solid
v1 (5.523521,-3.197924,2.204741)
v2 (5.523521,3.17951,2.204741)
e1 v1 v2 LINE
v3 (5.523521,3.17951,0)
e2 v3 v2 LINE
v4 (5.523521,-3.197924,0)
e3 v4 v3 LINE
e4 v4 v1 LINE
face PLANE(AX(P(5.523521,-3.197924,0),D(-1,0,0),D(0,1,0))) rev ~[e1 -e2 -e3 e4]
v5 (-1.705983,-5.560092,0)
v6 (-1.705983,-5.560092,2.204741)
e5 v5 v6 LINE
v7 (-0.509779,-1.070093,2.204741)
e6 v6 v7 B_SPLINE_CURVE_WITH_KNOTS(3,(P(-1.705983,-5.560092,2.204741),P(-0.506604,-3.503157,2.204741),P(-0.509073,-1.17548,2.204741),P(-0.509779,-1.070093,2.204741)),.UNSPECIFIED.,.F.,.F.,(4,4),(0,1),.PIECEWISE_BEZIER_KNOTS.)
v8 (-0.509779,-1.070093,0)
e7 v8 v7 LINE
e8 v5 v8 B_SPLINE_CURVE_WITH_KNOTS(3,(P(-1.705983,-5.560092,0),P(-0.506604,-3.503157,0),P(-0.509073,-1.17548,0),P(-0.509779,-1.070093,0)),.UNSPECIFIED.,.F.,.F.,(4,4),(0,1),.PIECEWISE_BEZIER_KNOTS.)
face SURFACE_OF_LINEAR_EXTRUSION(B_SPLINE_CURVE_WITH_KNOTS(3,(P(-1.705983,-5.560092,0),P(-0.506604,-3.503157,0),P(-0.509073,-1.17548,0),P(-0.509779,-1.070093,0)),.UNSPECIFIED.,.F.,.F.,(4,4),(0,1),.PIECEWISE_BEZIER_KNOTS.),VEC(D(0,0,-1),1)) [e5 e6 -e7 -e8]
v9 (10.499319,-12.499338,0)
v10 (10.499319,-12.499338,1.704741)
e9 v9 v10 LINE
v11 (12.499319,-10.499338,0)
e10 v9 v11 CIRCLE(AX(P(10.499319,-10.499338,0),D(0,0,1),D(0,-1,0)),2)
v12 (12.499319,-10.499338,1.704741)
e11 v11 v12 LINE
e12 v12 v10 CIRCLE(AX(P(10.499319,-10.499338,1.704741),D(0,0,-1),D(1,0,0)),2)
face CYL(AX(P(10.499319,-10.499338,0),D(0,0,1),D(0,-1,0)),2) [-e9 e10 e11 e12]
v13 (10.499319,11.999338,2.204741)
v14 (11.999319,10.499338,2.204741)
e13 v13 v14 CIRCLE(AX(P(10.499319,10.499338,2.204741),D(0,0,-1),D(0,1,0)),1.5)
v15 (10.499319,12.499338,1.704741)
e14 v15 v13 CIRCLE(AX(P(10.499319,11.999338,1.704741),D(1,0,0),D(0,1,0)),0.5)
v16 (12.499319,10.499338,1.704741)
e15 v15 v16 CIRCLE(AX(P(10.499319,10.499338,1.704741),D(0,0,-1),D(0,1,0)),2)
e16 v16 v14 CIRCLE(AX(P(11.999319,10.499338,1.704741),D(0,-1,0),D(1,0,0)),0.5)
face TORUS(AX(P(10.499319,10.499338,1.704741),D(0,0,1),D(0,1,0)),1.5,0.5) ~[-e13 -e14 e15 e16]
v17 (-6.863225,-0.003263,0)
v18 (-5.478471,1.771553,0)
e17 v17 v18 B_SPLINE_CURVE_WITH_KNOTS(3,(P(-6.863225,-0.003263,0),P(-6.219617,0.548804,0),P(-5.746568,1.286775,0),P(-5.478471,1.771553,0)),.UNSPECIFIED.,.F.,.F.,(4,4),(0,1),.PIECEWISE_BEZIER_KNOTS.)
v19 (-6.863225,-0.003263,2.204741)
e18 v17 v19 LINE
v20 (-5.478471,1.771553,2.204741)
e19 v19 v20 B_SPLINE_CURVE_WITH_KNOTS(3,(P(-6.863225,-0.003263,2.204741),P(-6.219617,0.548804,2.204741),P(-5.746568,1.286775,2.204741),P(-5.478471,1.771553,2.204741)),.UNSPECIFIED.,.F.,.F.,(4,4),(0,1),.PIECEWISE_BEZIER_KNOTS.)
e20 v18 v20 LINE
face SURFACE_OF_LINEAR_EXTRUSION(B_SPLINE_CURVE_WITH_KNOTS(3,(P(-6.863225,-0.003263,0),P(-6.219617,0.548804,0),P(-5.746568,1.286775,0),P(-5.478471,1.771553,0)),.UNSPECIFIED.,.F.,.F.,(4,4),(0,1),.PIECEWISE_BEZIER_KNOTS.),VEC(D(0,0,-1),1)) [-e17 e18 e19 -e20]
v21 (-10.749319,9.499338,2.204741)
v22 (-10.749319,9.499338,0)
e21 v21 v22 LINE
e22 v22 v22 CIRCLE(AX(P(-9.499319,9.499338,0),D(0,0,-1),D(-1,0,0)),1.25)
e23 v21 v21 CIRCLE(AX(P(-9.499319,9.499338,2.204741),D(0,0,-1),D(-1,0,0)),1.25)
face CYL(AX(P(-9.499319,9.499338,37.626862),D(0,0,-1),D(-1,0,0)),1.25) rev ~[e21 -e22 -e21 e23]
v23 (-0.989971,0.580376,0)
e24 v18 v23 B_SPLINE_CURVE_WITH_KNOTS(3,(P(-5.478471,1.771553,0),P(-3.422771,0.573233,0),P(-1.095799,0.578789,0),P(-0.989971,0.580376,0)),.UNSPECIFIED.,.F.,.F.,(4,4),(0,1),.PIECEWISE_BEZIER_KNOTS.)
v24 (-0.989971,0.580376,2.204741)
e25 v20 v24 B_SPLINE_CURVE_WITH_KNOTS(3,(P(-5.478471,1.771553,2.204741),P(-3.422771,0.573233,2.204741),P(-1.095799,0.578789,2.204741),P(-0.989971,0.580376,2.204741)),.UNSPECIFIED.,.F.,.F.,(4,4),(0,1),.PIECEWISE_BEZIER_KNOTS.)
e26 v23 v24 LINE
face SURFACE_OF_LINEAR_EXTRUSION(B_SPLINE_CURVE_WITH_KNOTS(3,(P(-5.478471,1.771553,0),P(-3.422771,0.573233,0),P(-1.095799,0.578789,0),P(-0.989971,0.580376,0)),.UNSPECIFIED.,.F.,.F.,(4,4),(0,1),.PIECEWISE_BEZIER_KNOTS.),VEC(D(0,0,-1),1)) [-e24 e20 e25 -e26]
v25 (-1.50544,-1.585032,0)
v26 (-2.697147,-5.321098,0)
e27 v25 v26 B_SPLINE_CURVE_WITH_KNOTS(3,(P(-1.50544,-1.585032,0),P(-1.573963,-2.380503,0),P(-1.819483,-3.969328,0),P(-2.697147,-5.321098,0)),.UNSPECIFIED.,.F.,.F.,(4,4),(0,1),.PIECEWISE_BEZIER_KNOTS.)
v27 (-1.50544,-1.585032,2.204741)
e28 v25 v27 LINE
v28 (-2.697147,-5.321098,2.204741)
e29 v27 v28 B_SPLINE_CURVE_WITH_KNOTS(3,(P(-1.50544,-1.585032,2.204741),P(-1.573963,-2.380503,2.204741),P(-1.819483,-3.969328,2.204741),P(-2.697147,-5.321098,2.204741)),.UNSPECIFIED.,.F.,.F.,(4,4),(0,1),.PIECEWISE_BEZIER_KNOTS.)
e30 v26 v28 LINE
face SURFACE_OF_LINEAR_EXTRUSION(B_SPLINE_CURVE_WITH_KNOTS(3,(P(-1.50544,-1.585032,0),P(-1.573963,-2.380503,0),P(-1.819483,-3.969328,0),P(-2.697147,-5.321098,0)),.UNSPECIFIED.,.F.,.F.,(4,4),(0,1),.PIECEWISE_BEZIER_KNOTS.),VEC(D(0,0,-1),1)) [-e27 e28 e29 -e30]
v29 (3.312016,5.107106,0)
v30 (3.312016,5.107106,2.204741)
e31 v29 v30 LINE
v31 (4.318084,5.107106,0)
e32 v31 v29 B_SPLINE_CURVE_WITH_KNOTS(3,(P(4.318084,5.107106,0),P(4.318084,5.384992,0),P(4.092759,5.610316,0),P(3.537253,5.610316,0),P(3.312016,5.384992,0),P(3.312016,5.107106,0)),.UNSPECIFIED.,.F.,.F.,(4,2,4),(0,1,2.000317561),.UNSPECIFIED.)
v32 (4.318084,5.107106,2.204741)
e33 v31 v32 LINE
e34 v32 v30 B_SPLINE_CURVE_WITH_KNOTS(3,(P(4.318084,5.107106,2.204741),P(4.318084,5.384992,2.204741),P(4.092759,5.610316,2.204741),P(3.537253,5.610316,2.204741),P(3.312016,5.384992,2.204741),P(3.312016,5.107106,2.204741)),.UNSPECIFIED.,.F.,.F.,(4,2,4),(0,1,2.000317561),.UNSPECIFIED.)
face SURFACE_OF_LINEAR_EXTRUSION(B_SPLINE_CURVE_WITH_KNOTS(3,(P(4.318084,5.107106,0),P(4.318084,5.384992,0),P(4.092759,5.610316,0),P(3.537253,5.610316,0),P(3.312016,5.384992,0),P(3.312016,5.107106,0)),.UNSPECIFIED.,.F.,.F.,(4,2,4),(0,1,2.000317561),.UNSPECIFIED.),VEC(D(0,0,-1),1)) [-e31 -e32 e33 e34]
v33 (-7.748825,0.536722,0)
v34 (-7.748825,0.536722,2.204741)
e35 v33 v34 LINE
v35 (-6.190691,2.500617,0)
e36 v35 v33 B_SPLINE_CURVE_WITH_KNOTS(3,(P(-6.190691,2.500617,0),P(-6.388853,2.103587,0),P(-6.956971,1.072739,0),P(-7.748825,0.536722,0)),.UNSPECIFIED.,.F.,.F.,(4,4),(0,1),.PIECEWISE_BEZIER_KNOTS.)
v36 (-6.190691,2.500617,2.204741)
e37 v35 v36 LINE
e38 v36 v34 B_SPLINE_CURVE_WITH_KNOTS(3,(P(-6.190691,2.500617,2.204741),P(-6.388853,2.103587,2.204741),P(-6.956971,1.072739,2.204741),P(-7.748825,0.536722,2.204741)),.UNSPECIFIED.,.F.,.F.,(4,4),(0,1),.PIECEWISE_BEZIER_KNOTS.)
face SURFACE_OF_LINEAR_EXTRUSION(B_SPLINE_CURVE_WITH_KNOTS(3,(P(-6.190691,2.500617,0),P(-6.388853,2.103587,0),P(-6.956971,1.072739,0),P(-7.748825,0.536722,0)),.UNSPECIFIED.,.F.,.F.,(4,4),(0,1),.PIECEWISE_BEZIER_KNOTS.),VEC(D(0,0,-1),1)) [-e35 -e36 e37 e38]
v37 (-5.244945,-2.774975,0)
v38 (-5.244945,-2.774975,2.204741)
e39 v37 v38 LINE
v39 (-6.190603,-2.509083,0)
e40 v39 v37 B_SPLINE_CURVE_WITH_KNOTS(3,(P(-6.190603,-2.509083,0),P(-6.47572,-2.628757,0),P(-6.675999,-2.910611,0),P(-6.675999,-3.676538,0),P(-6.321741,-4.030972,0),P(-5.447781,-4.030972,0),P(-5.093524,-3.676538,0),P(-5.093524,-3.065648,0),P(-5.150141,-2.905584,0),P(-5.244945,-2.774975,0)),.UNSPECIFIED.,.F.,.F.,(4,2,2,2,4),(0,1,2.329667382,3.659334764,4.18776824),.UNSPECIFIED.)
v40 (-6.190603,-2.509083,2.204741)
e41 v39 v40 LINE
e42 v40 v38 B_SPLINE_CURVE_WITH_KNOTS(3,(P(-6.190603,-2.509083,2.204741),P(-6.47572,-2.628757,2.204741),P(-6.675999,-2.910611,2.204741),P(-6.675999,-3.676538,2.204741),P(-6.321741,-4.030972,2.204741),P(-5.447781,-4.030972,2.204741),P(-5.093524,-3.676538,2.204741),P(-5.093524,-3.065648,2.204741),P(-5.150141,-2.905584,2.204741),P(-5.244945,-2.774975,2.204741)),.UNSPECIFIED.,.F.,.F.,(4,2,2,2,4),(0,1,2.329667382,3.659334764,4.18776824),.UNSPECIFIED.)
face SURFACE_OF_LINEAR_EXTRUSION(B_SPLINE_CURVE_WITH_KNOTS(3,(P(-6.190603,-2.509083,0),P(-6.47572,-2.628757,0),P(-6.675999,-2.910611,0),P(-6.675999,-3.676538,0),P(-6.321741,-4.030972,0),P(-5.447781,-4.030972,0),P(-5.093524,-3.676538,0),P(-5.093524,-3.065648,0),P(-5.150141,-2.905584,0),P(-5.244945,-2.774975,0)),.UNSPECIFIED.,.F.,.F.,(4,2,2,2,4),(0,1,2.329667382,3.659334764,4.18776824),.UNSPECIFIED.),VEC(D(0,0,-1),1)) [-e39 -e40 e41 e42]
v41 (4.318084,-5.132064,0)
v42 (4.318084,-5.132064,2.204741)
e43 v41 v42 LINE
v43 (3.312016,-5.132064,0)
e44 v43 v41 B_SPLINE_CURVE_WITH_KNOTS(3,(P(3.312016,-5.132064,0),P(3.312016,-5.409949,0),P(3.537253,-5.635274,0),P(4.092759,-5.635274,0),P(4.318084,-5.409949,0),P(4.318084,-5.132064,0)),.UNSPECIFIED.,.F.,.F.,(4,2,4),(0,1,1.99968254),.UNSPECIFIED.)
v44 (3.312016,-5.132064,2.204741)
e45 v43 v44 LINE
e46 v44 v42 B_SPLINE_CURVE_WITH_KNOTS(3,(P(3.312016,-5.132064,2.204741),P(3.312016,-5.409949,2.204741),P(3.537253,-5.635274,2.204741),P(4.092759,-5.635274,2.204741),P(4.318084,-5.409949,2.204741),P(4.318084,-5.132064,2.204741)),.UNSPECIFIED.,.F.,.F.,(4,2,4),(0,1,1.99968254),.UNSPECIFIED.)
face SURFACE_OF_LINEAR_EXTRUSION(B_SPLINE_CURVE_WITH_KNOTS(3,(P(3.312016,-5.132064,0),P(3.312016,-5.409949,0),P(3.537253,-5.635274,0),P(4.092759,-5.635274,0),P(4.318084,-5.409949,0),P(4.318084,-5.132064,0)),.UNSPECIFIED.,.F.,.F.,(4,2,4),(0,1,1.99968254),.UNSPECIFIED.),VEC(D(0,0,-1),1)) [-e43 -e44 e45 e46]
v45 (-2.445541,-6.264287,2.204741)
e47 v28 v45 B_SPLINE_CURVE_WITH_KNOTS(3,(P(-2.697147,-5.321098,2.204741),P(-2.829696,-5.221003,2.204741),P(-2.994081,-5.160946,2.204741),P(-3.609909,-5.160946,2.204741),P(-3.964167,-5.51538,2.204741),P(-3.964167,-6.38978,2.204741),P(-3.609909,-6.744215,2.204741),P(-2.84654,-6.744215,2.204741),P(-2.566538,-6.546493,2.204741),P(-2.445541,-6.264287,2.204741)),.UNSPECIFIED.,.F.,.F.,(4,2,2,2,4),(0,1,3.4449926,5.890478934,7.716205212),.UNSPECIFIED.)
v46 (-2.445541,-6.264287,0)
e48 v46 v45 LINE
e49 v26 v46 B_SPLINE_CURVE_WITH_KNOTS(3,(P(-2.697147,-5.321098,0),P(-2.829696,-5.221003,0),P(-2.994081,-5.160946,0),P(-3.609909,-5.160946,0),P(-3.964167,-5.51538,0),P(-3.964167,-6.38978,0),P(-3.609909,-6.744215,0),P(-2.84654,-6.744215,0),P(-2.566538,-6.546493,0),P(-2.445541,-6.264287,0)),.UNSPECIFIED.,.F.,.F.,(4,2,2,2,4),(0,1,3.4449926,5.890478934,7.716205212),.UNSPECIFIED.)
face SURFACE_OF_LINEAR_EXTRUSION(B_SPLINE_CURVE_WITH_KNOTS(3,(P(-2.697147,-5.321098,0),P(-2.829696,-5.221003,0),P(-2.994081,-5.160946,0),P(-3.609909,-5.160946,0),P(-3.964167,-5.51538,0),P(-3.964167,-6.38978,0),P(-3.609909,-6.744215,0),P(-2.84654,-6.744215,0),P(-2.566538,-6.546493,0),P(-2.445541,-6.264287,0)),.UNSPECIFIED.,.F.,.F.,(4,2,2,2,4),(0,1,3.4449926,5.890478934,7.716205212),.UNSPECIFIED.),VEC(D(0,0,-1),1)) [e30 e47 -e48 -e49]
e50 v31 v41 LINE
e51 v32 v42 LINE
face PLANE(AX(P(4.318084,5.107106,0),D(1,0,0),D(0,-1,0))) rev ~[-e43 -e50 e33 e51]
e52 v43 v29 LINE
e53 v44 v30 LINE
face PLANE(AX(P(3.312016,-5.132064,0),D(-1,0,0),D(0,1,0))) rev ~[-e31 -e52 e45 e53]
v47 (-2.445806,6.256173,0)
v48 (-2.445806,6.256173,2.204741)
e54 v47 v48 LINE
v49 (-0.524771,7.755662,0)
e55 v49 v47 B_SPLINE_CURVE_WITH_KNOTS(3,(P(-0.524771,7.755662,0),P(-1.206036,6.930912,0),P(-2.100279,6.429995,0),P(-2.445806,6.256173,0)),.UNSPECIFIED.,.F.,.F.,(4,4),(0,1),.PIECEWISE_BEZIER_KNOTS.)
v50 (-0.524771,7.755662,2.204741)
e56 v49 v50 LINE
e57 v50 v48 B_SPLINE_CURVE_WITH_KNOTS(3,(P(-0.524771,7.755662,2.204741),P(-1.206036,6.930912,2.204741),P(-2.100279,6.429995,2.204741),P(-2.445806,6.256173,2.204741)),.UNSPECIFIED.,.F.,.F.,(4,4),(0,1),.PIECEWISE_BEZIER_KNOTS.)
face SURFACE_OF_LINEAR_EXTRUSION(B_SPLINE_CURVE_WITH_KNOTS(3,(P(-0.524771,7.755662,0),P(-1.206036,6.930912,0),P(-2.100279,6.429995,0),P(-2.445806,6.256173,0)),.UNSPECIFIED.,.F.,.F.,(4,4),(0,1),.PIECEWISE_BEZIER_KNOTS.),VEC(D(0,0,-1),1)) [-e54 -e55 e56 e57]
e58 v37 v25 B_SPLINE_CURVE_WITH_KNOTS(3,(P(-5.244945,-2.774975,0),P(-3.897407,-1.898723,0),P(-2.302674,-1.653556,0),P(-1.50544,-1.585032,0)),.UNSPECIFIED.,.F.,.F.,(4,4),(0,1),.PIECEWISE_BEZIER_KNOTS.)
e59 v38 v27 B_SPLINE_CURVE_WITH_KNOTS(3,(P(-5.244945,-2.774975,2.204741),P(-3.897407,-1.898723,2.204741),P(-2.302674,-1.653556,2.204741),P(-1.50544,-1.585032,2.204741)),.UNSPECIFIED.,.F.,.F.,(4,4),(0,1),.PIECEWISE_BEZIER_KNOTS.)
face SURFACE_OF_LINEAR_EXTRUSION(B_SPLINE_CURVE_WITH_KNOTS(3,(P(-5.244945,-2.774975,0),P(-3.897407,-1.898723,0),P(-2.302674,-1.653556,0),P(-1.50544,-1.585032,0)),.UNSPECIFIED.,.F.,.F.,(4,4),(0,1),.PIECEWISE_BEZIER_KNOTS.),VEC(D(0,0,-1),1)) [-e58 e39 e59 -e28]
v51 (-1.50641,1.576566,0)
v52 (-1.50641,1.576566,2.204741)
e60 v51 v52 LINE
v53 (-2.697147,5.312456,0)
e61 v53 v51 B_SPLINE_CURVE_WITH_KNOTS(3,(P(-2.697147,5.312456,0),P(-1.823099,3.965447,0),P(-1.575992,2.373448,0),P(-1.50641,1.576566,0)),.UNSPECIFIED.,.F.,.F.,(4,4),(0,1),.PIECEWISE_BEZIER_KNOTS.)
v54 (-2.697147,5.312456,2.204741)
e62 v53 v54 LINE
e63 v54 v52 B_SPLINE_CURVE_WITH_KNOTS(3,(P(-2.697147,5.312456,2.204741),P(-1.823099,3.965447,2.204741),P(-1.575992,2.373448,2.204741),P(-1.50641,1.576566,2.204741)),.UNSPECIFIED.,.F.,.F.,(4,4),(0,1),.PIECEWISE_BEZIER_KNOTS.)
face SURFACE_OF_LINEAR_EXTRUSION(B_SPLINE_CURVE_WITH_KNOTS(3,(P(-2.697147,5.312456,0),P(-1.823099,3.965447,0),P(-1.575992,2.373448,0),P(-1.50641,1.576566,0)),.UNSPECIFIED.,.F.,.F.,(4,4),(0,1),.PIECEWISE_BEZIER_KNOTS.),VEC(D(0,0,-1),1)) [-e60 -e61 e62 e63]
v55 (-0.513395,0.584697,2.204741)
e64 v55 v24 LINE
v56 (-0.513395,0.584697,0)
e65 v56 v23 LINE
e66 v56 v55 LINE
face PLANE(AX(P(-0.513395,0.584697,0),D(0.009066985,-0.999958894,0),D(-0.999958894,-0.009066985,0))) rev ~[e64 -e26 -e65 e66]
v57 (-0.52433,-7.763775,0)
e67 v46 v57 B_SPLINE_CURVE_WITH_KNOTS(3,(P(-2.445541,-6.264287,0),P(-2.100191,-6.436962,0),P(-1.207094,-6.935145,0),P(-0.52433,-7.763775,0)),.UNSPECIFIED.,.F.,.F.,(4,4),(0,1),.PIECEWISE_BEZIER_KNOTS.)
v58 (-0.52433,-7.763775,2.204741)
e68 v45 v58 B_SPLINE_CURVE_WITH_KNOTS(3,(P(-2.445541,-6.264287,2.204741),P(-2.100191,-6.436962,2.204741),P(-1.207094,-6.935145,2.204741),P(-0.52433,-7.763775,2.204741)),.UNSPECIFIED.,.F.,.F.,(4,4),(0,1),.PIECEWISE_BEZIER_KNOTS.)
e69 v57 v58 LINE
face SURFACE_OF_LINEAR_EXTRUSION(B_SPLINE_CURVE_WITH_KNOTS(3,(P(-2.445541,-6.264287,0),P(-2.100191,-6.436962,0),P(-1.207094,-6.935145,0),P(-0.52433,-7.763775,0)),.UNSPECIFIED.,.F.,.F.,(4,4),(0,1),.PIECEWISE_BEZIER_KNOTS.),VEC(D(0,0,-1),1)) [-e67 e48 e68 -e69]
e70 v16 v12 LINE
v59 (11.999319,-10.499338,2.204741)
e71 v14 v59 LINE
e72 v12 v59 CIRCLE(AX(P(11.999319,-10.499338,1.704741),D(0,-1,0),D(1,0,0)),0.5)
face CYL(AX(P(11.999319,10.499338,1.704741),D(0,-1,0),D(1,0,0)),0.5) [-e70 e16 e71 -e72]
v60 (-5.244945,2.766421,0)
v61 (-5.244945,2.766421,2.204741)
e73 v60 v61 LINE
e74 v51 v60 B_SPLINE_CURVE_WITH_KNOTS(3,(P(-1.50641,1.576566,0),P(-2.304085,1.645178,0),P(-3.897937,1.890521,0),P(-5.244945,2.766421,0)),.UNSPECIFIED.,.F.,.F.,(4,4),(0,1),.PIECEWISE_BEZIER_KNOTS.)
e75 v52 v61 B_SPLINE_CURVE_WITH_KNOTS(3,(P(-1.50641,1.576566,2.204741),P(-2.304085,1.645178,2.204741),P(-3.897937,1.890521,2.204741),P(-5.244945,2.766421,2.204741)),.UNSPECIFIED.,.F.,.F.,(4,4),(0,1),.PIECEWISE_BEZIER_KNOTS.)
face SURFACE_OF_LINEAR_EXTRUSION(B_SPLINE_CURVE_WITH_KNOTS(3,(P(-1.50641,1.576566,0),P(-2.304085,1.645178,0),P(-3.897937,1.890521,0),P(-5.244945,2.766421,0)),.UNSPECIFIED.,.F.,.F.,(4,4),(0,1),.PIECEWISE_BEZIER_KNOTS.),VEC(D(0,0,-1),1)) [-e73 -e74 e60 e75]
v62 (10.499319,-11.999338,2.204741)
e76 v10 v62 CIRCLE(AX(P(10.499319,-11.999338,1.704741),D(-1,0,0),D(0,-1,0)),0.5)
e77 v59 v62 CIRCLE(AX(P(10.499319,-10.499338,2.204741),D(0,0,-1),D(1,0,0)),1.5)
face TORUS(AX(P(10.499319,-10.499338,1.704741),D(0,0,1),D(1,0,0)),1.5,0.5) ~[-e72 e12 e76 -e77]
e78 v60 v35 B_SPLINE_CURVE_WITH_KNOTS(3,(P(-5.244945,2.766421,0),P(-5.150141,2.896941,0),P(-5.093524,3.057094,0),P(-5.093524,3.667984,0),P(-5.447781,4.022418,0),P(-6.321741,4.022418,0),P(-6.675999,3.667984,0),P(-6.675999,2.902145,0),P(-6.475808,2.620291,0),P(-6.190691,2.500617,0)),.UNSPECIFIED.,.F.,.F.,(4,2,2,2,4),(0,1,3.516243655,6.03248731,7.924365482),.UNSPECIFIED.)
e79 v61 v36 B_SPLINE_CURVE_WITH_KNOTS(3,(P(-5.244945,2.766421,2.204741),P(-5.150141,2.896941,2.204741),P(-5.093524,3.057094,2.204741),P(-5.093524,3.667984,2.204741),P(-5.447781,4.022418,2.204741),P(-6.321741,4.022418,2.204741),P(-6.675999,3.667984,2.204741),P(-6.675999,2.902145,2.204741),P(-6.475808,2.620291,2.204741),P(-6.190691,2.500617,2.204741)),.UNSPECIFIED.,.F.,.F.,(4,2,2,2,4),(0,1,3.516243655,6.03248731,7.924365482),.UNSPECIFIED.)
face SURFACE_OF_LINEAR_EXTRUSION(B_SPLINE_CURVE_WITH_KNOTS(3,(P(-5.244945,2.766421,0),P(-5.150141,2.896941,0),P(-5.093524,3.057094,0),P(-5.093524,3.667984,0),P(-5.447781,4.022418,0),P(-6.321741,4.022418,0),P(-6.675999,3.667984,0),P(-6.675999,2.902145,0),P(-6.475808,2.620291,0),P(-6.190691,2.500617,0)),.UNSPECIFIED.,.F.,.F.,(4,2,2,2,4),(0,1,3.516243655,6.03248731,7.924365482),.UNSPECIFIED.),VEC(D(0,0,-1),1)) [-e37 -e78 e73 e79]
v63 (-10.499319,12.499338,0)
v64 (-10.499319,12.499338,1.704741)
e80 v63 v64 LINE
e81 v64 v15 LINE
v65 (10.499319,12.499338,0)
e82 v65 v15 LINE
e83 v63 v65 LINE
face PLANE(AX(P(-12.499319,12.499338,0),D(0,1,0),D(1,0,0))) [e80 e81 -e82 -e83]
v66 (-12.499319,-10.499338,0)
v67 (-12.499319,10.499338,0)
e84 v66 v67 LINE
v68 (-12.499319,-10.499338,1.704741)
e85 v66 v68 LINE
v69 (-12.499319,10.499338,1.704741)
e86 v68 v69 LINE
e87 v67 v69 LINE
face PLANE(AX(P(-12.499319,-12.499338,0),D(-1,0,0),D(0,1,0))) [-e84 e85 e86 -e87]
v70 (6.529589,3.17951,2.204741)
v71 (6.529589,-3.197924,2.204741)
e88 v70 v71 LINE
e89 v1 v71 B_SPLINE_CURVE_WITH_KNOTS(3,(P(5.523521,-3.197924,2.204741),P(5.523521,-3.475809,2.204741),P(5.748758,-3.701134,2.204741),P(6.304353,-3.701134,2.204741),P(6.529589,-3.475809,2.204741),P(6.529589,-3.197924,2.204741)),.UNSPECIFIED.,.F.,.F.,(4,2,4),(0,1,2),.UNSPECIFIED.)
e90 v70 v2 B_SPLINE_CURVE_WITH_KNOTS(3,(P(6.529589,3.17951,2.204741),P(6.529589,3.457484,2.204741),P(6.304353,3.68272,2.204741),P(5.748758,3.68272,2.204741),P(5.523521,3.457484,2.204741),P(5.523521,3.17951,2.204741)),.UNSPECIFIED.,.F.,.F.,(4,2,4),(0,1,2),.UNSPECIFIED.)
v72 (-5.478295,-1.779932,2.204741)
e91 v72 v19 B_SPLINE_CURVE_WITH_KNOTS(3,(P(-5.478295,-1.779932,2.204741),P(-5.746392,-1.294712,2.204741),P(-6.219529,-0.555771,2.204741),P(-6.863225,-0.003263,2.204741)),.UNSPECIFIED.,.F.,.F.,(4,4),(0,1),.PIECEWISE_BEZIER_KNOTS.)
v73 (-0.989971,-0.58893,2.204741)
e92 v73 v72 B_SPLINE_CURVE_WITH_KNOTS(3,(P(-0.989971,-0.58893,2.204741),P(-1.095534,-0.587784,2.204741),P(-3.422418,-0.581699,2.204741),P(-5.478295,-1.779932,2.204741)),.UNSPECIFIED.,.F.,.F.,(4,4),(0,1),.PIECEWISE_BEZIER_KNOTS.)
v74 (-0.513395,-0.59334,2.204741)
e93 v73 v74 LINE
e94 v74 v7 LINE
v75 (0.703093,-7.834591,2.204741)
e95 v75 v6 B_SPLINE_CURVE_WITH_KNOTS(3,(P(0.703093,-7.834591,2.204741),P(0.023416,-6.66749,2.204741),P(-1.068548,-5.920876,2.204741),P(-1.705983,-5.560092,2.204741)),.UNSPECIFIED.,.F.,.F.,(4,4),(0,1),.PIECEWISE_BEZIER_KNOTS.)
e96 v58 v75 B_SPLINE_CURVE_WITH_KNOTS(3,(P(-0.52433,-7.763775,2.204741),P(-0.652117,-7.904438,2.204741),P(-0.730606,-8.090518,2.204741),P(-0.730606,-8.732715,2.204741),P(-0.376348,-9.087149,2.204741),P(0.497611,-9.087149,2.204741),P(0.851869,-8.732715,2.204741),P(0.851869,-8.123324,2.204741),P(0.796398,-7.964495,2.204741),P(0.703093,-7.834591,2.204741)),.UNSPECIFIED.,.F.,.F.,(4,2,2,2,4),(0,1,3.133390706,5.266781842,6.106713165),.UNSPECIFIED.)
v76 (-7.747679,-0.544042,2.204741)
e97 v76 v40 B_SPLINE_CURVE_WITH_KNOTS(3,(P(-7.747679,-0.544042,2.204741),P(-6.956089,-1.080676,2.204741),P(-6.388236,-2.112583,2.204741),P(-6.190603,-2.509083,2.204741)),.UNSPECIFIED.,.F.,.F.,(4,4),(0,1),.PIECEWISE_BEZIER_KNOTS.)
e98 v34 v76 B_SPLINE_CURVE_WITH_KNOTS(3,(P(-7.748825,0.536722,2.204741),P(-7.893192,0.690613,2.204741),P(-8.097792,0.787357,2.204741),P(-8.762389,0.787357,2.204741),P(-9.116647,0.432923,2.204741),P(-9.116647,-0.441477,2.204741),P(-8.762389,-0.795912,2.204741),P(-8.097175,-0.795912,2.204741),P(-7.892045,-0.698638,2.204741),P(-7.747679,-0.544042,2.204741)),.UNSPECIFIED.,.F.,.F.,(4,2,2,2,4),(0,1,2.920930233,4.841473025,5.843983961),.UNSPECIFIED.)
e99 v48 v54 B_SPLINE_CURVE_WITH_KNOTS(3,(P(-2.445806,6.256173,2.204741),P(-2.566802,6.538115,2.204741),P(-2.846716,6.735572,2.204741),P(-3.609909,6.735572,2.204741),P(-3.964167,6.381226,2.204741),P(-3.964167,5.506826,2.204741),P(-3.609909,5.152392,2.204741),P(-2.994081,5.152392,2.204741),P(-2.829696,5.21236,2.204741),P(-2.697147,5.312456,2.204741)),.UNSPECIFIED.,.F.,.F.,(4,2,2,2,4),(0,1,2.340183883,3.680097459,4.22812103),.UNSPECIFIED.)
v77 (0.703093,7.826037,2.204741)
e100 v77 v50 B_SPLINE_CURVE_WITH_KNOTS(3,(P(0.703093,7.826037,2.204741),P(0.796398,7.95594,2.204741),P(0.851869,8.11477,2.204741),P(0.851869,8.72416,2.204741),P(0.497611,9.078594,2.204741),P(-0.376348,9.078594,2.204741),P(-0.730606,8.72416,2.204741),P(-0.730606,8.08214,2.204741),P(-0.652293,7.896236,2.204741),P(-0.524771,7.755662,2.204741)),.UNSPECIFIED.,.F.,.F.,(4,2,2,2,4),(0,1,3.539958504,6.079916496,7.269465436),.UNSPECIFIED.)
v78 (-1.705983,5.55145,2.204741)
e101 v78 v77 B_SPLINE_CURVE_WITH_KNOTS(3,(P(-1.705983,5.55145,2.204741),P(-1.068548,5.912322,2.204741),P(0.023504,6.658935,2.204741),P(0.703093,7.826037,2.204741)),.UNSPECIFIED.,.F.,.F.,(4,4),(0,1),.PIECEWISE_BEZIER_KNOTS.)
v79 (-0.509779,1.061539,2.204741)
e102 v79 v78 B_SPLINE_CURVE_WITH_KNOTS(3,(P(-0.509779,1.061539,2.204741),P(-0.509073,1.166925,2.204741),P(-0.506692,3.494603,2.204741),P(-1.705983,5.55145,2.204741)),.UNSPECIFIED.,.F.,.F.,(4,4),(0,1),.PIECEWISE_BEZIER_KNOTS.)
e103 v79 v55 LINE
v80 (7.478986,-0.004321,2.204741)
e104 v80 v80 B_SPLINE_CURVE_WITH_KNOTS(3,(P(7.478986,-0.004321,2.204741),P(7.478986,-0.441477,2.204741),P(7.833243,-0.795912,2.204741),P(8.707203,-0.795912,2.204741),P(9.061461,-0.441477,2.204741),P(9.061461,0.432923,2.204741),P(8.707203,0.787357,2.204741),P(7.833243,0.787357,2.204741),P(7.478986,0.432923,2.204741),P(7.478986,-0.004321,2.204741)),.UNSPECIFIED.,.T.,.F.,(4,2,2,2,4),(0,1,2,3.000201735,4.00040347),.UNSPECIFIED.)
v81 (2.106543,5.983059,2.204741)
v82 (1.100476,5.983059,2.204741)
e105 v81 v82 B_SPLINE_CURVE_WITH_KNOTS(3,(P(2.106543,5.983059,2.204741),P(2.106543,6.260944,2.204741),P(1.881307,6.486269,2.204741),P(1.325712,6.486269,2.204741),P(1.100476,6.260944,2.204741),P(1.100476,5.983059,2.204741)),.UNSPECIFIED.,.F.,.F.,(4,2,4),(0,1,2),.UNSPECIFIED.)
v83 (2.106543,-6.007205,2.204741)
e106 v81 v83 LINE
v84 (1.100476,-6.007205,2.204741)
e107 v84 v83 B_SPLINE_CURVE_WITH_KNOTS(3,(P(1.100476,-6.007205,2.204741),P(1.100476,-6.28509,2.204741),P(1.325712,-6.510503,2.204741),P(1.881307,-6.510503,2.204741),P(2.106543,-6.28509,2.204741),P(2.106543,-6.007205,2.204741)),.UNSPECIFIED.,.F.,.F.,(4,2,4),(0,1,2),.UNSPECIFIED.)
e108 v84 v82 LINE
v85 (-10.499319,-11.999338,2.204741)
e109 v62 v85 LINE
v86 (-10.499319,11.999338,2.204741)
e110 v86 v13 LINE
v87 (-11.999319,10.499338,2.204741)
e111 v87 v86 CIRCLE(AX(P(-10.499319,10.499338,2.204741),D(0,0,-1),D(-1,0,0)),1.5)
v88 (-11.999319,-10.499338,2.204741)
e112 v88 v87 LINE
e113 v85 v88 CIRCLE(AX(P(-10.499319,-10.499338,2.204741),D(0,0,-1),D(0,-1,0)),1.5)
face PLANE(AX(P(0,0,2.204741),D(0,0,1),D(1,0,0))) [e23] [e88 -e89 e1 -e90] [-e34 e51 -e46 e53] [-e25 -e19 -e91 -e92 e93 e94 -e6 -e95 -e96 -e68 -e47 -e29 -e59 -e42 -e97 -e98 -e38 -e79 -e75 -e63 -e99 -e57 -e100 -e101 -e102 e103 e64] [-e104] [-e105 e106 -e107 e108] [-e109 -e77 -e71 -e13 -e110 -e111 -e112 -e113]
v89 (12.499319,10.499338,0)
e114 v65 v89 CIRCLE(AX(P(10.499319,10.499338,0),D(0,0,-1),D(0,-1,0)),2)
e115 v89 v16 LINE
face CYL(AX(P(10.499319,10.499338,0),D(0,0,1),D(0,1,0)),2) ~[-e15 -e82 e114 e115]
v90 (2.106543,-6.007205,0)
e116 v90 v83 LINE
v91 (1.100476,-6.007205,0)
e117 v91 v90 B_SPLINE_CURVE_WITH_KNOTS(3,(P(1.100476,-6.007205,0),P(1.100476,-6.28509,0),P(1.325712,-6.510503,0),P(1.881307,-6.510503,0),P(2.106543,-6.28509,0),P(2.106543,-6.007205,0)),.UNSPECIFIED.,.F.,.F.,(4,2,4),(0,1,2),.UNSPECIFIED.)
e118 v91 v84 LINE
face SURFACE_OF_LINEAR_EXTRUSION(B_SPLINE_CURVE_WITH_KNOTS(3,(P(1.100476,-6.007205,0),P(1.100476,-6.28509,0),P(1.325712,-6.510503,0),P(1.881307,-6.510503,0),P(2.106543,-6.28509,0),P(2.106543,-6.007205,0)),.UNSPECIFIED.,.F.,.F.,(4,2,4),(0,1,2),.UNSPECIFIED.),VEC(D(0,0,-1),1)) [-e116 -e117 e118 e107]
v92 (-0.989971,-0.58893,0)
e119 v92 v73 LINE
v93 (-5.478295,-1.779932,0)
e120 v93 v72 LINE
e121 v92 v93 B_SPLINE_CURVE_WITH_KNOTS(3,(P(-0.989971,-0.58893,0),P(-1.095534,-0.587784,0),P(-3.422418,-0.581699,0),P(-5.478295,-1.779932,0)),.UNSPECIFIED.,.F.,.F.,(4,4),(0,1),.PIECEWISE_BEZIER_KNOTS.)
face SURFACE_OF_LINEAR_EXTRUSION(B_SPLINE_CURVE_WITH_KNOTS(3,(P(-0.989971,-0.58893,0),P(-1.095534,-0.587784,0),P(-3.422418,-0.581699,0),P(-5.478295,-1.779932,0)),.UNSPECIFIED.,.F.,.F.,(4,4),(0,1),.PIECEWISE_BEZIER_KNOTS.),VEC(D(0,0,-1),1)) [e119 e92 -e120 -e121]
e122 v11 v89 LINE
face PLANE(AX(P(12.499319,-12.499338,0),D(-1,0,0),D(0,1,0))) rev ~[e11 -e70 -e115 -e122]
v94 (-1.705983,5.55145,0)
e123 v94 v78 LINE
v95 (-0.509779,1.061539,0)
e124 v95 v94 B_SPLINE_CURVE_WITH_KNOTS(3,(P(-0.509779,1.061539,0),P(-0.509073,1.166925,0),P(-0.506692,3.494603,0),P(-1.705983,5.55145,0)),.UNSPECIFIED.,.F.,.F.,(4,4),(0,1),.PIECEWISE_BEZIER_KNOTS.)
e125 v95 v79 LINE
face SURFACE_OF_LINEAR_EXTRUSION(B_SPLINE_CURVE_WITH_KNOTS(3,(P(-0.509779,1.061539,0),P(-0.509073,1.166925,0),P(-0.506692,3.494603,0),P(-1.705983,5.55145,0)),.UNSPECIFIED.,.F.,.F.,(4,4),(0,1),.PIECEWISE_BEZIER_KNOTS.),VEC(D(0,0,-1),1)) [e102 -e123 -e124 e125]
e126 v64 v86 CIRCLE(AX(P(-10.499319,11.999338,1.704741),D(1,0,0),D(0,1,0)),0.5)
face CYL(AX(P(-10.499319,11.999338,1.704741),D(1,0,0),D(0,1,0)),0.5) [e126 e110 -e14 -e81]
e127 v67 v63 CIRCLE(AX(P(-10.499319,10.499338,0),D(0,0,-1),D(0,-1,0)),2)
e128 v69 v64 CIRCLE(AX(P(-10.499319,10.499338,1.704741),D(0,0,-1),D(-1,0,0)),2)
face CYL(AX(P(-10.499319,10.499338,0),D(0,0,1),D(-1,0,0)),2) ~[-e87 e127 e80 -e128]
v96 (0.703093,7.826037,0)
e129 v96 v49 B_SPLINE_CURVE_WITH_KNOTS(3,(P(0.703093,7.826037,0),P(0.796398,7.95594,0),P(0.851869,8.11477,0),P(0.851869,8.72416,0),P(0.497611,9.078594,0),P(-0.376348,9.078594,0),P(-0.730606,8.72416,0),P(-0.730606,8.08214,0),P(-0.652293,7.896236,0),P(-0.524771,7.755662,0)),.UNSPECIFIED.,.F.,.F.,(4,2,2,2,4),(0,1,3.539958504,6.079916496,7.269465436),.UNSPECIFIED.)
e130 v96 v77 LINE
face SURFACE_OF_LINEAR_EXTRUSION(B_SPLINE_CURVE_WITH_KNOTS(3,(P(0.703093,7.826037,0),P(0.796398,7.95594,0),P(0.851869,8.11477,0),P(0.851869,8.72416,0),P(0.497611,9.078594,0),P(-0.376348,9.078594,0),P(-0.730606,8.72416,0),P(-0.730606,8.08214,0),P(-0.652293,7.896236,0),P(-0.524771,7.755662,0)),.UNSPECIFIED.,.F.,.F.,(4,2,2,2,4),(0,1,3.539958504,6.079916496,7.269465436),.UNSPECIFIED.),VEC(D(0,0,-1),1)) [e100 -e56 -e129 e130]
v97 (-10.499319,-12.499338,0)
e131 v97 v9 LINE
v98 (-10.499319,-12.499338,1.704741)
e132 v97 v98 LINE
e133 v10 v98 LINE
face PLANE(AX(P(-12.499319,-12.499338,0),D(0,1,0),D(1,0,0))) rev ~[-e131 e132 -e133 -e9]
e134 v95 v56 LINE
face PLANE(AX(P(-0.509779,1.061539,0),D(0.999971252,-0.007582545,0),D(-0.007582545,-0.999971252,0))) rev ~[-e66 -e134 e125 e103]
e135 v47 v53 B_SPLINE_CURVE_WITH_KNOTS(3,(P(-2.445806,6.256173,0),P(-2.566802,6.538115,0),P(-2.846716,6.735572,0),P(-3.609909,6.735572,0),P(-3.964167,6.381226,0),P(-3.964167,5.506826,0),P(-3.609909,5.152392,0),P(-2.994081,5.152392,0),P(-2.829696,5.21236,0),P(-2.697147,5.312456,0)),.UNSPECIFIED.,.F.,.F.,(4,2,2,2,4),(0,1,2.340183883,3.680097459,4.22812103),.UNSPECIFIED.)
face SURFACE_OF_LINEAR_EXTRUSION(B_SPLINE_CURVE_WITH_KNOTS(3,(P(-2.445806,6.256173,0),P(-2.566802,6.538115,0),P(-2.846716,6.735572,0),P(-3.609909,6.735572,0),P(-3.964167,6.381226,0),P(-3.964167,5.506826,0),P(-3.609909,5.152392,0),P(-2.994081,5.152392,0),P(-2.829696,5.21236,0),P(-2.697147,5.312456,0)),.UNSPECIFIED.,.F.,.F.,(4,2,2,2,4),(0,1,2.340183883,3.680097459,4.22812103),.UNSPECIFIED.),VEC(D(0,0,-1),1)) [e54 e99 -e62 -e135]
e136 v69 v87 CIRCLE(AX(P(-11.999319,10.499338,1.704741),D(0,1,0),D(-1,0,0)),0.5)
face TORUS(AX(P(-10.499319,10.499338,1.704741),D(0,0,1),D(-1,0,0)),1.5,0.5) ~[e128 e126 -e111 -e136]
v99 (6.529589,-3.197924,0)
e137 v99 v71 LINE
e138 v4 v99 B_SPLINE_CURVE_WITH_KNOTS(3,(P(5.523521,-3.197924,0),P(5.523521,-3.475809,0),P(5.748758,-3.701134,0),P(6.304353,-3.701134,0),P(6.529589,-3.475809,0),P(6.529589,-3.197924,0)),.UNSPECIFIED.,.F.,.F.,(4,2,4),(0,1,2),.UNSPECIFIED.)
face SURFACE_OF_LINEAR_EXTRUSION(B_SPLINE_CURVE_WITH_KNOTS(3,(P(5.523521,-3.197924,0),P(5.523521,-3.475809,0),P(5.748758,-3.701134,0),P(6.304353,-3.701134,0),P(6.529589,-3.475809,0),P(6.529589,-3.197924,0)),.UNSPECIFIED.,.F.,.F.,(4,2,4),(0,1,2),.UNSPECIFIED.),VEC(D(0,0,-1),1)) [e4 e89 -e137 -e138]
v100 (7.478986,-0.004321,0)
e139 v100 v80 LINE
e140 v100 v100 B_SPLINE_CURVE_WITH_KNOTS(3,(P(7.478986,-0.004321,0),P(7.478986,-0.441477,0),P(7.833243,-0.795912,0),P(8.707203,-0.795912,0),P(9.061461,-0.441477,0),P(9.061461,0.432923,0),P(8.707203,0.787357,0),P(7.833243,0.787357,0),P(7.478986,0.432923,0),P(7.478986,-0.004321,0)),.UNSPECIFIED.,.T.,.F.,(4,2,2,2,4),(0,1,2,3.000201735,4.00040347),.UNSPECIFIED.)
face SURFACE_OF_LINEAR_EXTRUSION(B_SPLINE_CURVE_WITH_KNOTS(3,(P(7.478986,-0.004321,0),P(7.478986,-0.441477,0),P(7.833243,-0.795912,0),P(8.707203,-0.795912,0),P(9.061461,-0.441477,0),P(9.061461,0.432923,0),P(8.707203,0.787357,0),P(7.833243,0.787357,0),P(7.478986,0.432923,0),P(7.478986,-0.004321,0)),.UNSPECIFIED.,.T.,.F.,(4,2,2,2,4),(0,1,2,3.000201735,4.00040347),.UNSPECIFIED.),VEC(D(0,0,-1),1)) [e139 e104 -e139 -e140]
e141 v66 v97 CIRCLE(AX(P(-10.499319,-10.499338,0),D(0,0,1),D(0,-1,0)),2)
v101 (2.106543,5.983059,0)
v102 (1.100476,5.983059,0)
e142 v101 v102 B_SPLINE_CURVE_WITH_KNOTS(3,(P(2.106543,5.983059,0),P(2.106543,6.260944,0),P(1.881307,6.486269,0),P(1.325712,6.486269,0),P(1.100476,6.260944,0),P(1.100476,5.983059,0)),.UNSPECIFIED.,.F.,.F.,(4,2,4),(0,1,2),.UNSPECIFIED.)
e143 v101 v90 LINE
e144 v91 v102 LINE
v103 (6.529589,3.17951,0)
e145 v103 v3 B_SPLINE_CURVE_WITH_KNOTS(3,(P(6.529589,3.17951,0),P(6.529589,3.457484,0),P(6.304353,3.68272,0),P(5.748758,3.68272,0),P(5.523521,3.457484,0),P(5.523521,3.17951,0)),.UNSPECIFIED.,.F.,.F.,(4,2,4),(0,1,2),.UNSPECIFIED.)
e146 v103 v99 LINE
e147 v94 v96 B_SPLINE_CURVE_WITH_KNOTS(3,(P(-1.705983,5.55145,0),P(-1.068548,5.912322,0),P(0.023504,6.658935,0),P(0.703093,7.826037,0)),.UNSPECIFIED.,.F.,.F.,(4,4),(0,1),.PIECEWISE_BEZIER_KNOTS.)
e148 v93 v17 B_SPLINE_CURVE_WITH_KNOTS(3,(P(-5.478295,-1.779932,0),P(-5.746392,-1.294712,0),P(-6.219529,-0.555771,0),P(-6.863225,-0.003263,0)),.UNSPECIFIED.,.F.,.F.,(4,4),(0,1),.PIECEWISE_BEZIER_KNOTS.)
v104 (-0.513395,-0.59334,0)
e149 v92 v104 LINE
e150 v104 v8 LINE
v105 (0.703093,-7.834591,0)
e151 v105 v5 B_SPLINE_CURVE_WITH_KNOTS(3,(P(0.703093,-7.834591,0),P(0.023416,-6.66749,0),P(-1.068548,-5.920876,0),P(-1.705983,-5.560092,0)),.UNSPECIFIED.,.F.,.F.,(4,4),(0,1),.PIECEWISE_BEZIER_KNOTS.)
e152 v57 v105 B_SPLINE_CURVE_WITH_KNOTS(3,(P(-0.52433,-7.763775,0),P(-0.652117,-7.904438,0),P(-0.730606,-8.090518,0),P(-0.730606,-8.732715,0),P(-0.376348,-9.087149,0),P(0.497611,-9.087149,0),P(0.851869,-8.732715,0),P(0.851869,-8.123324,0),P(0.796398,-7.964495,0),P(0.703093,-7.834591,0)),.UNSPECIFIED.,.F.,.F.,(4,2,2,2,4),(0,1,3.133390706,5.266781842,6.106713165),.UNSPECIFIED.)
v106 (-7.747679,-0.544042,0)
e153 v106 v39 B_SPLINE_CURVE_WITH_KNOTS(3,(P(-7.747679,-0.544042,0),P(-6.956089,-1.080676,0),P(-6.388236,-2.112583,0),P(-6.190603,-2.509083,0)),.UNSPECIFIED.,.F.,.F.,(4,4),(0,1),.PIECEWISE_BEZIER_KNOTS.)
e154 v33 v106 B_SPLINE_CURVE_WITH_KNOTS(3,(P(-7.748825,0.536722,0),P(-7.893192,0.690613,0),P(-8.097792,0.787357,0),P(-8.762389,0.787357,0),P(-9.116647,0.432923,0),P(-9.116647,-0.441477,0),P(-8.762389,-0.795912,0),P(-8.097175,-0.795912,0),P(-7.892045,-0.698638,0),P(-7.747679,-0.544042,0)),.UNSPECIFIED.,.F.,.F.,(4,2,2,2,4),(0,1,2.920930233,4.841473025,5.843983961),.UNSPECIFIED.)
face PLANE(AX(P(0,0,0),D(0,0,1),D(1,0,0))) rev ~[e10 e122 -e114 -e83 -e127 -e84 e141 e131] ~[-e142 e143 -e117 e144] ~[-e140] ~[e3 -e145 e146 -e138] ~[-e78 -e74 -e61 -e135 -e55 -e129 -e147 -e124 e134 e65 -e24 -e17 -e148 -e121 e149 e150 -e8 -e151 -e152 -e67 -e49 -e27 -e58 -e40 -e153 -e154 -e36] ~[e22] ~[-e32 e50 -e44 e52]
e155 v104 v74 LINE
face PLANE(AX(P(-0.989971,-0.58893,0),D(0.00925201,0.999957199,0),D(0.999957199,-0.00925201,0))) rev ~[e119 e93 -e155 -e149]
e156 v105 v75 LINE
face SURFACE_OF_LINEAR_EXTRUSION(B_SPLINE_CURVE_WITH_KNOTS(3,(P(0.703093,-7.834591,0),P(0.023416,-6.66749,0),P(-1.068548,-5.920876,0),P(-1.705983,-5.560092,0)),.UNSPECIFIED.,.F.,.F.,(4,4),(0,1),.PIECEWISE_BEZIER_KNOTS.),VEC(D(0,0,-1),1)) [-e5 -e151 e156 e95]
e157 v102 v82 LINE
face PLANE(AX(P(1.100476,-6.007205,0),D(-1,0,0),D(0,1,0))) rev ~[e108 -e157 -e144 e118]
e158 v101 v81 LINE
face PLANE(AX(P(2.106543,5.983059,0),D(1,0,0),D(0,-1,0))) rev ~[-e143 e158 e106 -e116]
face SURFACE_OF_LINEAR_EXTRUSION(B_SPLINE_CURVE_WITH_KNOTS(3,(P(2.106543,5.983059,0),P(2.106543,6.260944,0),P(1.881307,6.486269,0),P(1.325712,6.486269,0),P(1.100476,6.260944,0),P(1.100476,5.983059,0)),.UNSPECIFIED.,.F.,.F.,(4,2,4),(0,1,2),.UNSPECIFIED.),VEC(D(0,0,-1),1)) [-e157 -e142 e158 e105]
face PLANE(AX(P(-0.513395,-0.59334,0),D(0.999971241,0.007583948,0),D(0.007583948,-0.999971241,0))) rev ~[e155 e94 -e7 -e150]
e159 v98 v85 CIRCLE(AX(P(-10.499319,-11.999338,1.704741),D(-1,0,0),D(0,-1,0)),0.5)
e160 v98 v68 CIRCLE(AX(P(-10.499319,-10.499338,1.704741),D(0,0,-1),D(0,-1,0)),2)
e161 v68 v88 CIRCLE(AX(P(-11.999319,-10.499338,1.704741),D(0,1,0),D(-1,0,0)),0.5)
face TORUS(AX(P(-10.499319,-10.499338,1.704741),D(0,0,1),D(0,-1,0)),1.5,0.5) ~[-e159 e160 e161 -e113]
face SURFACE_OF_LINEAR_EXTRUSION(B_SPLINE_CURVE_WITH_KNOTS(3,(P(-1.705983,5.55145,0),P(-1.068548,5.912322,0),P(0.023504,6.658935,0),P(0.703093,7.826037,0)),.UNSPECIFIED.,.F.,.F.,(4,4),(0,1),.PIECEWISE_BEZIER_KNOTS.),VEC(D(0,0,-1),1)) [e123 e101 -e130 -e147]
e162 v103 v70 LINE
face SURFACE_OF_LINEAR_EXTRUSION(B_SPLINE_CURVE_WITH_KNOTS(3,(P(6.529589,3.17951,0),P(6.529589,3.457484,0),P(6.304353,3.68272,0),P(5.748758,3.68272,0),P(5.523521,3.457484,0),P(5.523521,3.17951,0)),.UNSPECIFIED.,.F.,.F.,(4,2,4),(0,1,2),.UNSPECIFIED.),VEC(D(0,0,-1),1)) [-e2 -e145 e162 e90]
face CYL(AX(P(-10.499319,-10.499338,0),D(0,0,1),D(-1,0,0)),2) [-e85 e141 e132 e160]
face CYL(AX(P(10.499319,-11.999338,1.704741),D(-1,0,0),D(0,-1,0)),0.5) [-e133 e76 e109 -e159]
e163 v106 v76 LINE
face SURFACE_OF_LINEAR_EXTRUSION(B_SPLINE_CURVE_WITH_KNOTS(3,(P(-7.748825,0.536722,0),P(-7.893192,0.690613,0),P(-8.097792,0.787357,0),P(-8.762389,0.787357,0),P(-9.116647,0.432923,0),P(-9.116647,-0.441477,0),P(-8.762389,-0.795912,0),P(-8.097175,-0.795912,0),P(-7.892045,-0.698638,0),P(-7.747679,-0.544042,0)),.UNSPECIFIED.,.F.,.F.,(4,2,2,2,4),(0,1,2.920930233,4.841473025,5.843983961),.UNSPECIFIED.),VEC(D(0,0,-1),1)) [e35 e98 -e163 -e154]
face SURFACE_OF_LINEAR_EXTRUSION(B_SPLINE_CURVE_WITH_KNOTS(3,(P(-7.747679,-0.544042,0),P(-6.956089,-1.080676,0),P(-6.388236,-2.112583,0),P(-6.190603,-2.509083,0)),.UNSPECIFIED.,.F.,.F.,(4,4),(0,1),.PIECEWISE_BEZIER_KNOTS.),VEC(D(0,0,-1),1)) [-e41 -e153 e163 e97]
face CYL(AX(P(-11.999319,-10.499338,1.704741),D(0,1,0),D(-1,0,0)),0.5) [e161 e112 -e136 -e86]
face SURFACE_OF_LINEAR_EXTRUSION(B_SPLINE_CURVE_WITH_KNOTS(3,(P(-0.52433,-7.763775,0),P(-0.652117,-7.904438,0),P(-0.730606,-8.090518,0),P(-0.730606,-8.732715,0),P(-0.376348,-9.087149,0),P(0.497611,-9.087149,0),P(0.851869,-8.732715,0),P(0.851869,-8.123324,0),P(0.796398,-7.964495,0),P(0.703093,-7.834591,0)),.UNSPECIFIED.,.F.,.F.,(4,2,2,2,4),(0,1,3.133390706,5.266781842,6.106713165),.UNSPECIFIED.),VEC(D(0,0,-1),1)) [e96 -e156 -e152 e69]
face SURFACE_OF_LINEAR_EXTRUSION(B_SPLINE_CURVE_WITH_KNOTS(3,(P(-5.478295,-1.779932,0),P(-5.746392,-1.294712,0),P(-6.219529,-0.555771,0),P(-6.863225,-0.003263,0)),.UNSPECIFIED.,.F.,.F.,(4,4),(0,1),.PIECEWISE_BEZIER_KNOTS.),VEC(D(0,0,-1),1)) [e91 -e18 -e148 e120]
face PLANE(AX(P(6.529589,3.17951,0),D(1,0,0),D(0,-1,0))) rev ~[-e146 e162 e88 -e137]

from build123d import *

# Parameters (mm, degrees)
F0_W     = 283.464563
F0_H     = 283.464993
F1_DEPTH = 25
F2_SCALE = 0.088189643
F4_D     = 2.5
F5_R     = 2
F6_R     = 0.5


with BuildPart() as f1:
    # F0 (on Top) → F1 (new body)
    with BuildSketch(Plane.XY):
        with Locations((5e-07, -5e-07)):
            Rectangle(F0_W, F0_H)
        with BuildLine():
            add(Edge.make_bspline(
                [(7.972515, 88.740998), (9.030515, 90.213998), (9.659515, 92.014998), (9.659515, 93.966998)],
                knots=[0, 0, 0, 0, 1, 1, 1, 1], degree=3))
            add(Edge.make_bspline(
                [(-19.344484, 62.948998), (-12.116484, 67.040998), (0.266515, 75.506998), (7.972515, 88.740998)],
                knots=[0, 0, 0, 0, 1, 1, 1, 1], degree=3))
            add(Edge.make_bspline(
                [(-5.780484, 12.037), (-5.772484, 13.232), (-5.745484, 39.625999), (-19.344484, 62.948998)],
                knots=[0, 0, 0, 0, 1, 1, 1, 1], degree=3))
            Line((-5.780484, 12.037), (-5.821484, 6.63))
            Line((-5.821484, 6.63), (-11.225484, 6.581))
            add(Edge.make_bspline(
                [(-62.121483, 20.087999), (-38.811484, 6.5), (-12.425484, 6.563), (-11.225484, 6.581)],
                knots=[0, 0, 0, 0, 1, 1, 1, 1], degree=3))
            add(Edge.make_bspline(
                [(-77.823483, -0.037), (-70.525483, 6.223), (-65.161483, 14.591), (-62.121483, 20.087999)],
                knots=[0, 0, 0, 0, 1, 1, 1, 1], degree=3))
            add(Edge.make_bspline(
                [(-62.119483, -20.183), (-65.159483, -14.681), (-70.524483, -6.302), (-77.823483, -0.037)],
                knots=[0, 0, 0, 0, 1, 1, 1, 1], degree=3))
            add(Edge.make_bspline(
                [(-11.225484, -6.678), (-12.422484, -6.665), (-38.807484, -6.596), (-62.119483, -20.183)],
                knots=[0, 0, 0, 0, 1, 1, 1, 1], degree=3))
            Line((-11.225484, -6.678), (-5.821484, -6.728))
            Line((-5.821484, -6.728), (-5.780484, -12.134))
            add(Edge.make_bspline(
                [(-19.344484, -63.046999), (-5.744484, -39.722999), (-5.772484, -13.329), (-5.780484, -12.134)],
                knots=[0, 0, 0, 0, 1, 1, 1, 1], degree=3))
            add(Edge.make_bspline(
                [(7.972515, -88.837998), (0.265515, -75.603998), (-12.116484, -67.137998), (-19.344484, -63.046999)],
                knots=[0, 0, 0, 0, 1, 1, 1, 1], degree=3))
            add(Edge.make_bspline(
                [(9.659515, -94.063998), (9.659515, -92.111998), (9.030515, -90.310998), (7.972515, -88.837998)],
                knots=[0, 0, 0, 0, 1, 1, 1, 1], degree=3))
            add(Edge.make_bspline(
                [(0.687515, -103.040998), (5.642515, -103.040998), (9.659515, -99.021998), (9.659515, -94.063998)],
                knots=[0, 0, 0, 0, 1, 1, 1, 1], degree=3))
            add(Edge.make_bspline(
                [(-8.284484, -94.063998), (-8.284484, -99.021998), (-4.267484, -103.040998), (0.687515, -103.040998)],
                knots=[0, 0, 0, 0, 1, 1, 1, 1], degree=3))
            add(Edge.make_bspline(
                [(-5.945484, -88.034998), (-7.394484, -89.629998), (-8.284484, -91.739998), (-8.284484, -94.063998)],
                knots=[0, 0, 0, 0, 1, 1, 1, 1], degree=3))
            add(Edge.make_bspline(
                [(-27.730484, -71.031998), (-23.814484, -72.989998), (-13.687484, -78.638998), (-5.945484, -88.034998)],
                knots=[0, 0, 0, 0, 1, 1, 1, 1], degree=3))
            add(Edge.make_bspline(
                [(-35.977484, -76.473998), (-32.277484, -76.473998), (-29.102484, -74.231998), (-27.730484, -71.031998)],
                knots=[0, 0, 0, 0, 1, 1, 1, 1], degree=3))
            add(Edge.make_bspline(
                [(-44.950483, -67.496998), (-44.950483, -72.454998), (-40.933484, -76.473998), (-35.977484, -76.473998)],
                knots=[0, 0, 0, 0, 1, 1, 1, 1], degree=3))
            add(Edge.make_bspline(
                [(-35.977484, -58.520999), (-40.933484, -58.520999), (-44.950483, -62.539999), (-44.950483, -67.496998)],
                knots=[0, 0, 0, 0, 1, 1, 1, 1], degree=3))
            add(Edge.make_bspline(
                [(-30.583484, -60.336999), (-32.086484, -59.201999), (-33.950484, -58.520999), (-35.977484, -58.520999)],
                knots=[0, 0, 0, 0, 1, 1, 1, 1], degree=3))
            add(Edge.make_bspline(
                [(-17.070484, -17.973), (-17.847484, -26.992999), (-20.631484, -45.008999), (-30.583484, -60.336999)],
                knots=[0, 0, 0, 0, 1, 1, 1, 1], degree=3))
            add(Edge.make_bspline(
                [(-59.473483, -31.465999), (-44.193483, -21.53), (-26.110484, -18.75), (-17.070484, -17.973)],
                knots=[0, 0, 0, 0, 1, 1, 1, 1], degree=3))
            add(Edge.make_bspline(
                [(-57.756483, -36.731999), (-57.756483, -34.761999), (-58.398483, -32.946999), (-59.473483, -31.465999)],
                knots=[0, 0, 0, 0, 1, 1, 1, 1], degree=3))
            add(Edge.make_bspline(
                [(-66.728483, -45.707999), (-61.773483, -45.707999), (-57.756483, -41.688999), (-57.756483, -36.731999)],
                knots=[0, 0, 0, 0, 1, 1, 1, 1], degree=3))
            add(Edge.make_bspline(
                [(-75.700483, -36.731999), (-75.700483, -41.688999), (-71.683483, -45.707999), (-66.728483, -45.707999)],
                knots=[0, 0, 0, 0, 1, 1, 1, 1], degree=3))
            add(Edge.make_bspline(
                [(-70.196483, -28.450999), (-73.429483, -29.807999), (-75.700483, -33.003999), (-75.700483, -36.731999)],
                knots=[0, 0, 0, 0, 1, 1, 1, 1], degree=3))
            add(Edge.make_bspline(
                [(-87.852482, -6.169), (-78.876483, -12.254), (-72.437483, -23.955), (-70.196483, -28.450999)],
                knots=[0, 0, 0, 0, 1, 1, 1, 1], degree=3))
            add(Edge.make_bspline(
                [(-94.402482, -9.025), (-91.815482, -9.025), (-89.489482, -7.922), (-87.852482, -6.169)],
                knots=[0, 0, 0, 0, 1, 1, 1, 1], degree=3))
            add(Edge.make_bspline(
                [(-103.375482, -0.049), (-103.375482, -5.006), (-99.358482, -9.025), (-94.402482, -9.025)],
                knots=[0, 0, 0, 0, 1, 1, 1, 1], degree=3))
            add(Edge.make_bspline(
                [(-94.402482, 8.928), (-99.358482, 8.928), (-103.375482, 4.909), (-103.375482, -0.049)],
                knots=[0, 0, 0, 0, 1, 1, 1, 1], degree=3))
            add(Edge.make_bspline(
                [(-87.865482, 6.086), (-89.502482, 7.831), (-91.822482, 8.928), (-94.402482, 8.928)],
                knots=[0, 0, 0, 0, 1, 1, 1, 1], degree=3))
            add(Edge.make_bspline(
                [(-70.197483, 28.354999), (-72.444483, 23.852999), (-78.886483, 12.164), (-87.865482, 6.086)],
                knots=[0, 0, 0, 0, 1, 1, 1, 1], degree=3))
            add(Edge.make_bspline(
                [(-75.700483, 36.634999), (-75.700483, 32.907999), (-73.430483, 29.711999), (-70.197483, 28.354999)],
                knots=[0, 0, 0, 0, 1, 1, 1, 1], degree=3))
            add(Edge.make_bspline(
                [(-66.728483, 45.610999), (-71.683483, 45.610999), (-75.700483, 41.591999), (-75.700483, 36.634999)],
                knots=[0, 0, 0, 0, 1, 1, 1, 1], degree=3))
            add(Edge.make_bspline(
                [(-57.756483, 36.634999), (-57.756483, 41.591999), (-61.773483, 45.610999), (-66.728483, 45.610999)],
                knots=[0, 0, 0, 0, 1, 1, 1, 1], degree=3))
            add(Edge.make_bspline(
                [(-59.473483, 31.368999), (-58.398483, 32.848999), (-57.756483, 34.664999), (-57.756483, 36.634999)],
                knots=[0, 0, 0, 0, 1, 1, 1, 1], degree=3))
            add(Edge.make_bspline(
                [(-17.081484, 17.876999), (-26.126484, 18.654999), (-44.199483, 21.436999), (-59.473483, 31.368999)],
                knots=[0, 0, 0, 0, 1, 1, 1, 1], degree=3))
            add(Edge.make_bspline(
                [(-30.583484, 60.238998), (-20.672484, 44.964999), (-17.870484, 26.912999), (-17.081484, 17.876999)],
                knots=[0, 0, 0, 0, 1, 1, 1, 1], degree=3))
            add(Edge.make_bspline(
                [(-35.977484, 58.423998), (-33.950484, 58.423998), (-32.086484, 59.103998), (-30.583484, 60.238998)],
                knots=[0, 0, 0, 0, 1, 1, 1, 1], degree=3))
            add(Edge.make_bspline(
                [(-44.950483, 67.399998), (-44.950483, 62.442998), (-40.933484, 58.423998), (-35.977484, 58.423998)],
                knots=[0, 0, 0, 0, 1, 1, 1, 1], degree=3))
            add(Edge.make_bspline(
                [(-35.977484, 76.375998), (-40.933484, 76.375998), (-44.950483, 72.357998), (-44.950483, 67.399998)],
                knots=[0, 0, 0, 0, 1, 1, 1, 1], degree=3))
            add(Edge.make_bspline(
                [(-27.733484, 70.939998), (-29.105484, 74.136998), (-32.279484, 76.375998), (-35.977484, 76.375998)],
                knots=[0, 0, 0, 0, 1, 1, 1, 1], degree=3))
            add(Edge.make_bspline(
                [(-5.950484, 87.942998), (-13.675484, 78.590998), (-23.815484, 72.910998), (-27.733484, 70.939998)],
                knots=[0, 0, 0, 0, 1, 1, 1, 1], degree=3))
            add(Edge.make_bspline(
                [(-8.284484, 93.966998), (-8.284484, 91.644998), (-7.396484, 89.536998), (-5.950484, 87.942998)],
                knots=[0, 0, 0, 0, 1, 1, 1, 1], degree=3))
            add(Edge.make_bspline(
                [(0.687515, 102.943997), (-4.267484, 102.943997), (-8.284484, 98.924997), (-8.284484, 93.966998)],
                knots=[0, 0, 0, 0, 1, 1, 1, 1], degree=3))
            add(Edge.make_bspline(
                [(9.659515, 93.966998), (9.659515, 98.924997), (5.642515, 102.943997), (0.687515, 102.943997)],
                knots=[0, 0, 0, 0, 1, 1, 1, 1], degree=3))
        make_face(mode=Mode.SUBTRACT)
        with BuildLine():
            add(Edge.make_bspline(
                [(18.182515, 73.549098), (15.032515, 73.549098), (12.478515, 70.994098), (12.478515, 67.843098)],
                knots=[0, 0, 0, 0, 1, 1, 1, 1], degree=3))
            add(Edge.make_bspline(
                [(23.886515, 67.843098), (23.886515, 70.994098), (21.332515, 73.549098), (18.182515, 73.549098)],
                knots=[0, 0, 0, 0, 1, 1, 1, 1], degree=3))
            Line((23.886515, 67.843098), (23.886515, -68.116898))
            add(Edge.make_bspline(
                [(18.182515, -73.823898), (21.332515, -73.823898), (23.886515, -71.267898), (23.886515, -68.116898)],
                knots=[0, 0, 0, 0, 1, 1, 1, 1], degree=3))
            add(Edge.make_bspline(
                [(12.478515, -68.116898), (12.478515, -71.267898), (15.032515, -73.823898), (18.182515, -73.823898)],
                knots=[0, 0, 0, 0, 1, 1, 1, 1], degree=3))
            Line((12.478515, -68.116898), (12.478515, 67.843098))
        make_face(mode=Mode.SUBTRACT)
        with BuildLine():
            add(Edge.make_bspline(
                [(43.259614, 63.616498), (40.109614, 63.616498), (37.555615, 61.061498), (37.555615, 57.910498)],
                knots=[0, 0, 0, 0, 1, 1, 1, 1], degree=3))
            add(Edge.make_bspline(
                [(48.963614, 57.910498), (48.963614, 61.061498), (46.408614, 63.616498), (43.259614, 63.616498)],
                knots=[0, 0, 0, 0, 1, 1, 1, 1], degree=3))
            Line((48.963614, 57.910498), (48.963614, -58.193499))
            add(Edge.make_bspline(
                [(43.259614, -63.899499), (46.408614, -63.899499), (48.963614, -61.344499), (48.963614, -58.193499)],
                knots=[0, 0, 0, 0, 1, 1, 1, 1], degree=3))
            add(Edge.make_bspline(
                [(37.555615, -58.193499), (37.555615, -61.344499), (40.109614, -63.899499), (43.259614, -63.899499)],
                knots=[0, 0, 0, 0, 1, 1, 1, 1], degree=3))
            Line((37.555615, -58.193499), (37.555615, 57.910498))
        make_face(mode=Mode.SUBTRACT)
        with BuildLine():
            add(Edge.make_bspline(
                [(68.336314, 41.759099), (65.186314, 41.759099), (62.632314, 39.205099), (62.632314, 36.053099)],
                knots=[0, 0, 0, 0, 1, 1, 1, 1], degree=3))
            add(Edge.make_bspline(
                [(74.040314, 36.053099), (74.040314, 39.205099), (71.486314, 41.759099), (68.336314, 41.759099)],
                knots=[0, 0, 0, 0, 1, 1, 1, 1], degree=3))
            Line((74.040314, 36.053099), (74.040314, -36.261899))
            add(Edge.make_bspline(
                [(68.336314, -41.967899), (71.486314, -41.967899), (74.040314, -39.412899), (74.040314, -36.261899)],
                knots=[0, 0, 0, 0, 1, 1, 1, 1], degree=3))
            add(Edge.make_bspline(
                [(62.632314, -36.261899), (62.632314, -39.412899), (65.186314, -41.967899), (68.336314, -41.967899)],
                knots=[0, 0, 0, 0, 1, 1, 1, 1], degree=3))
            Line((62.632314, -36.261899), (62.632314, 36.053099))
        make_face(mode=Mode.SUBTRACT)
        with BuildLine():
            add(Edge.make_bspline(
                [(93.777713, 8.928), (88.822713, 8.928), (84.805713, 4.909), (84.805713, -0.049)],
                knots=[0, 0, 0, 0, 1, 1, 1, 1], degree=3))
            add(Edge.make_bspline(
                [(102.749713, -0.049), (102.749713, 4.909), (98.732713, 8.928), (93.777713, 8.928)],
                knots=[0, 0, 0, 0, 1, 1, 1, 1], degree=3))
            add(Edge.make_bspline(
                [(93.777713, -9.025), (98.732713, -9.025), (102.749713, -5.006), (102.749713, -0.049)],
                knots=[0, 0, 0, 0, 1, 1, 1, 1], degree=3))
            add(Edge.make_bspline(
                [(84.805713, -0.049), (84.805713, -5.006), (88.822713, -9.025), (93.777713, -9.025)],
                knots=[0, 0, 0, 0, 1, 1, 1, 1], degree=3))
        make_face(mode=Mode.SUBTRACT)
    extrude(amount=F1_DEPTH)


with BuildPart() as f1_1:
    # F2: moved
    add(f1.part.scale(F2_SCALE))

    # F4 (through all)
    with Locations(Plane.XY.offset(2.204741075)):
        with Locations((-9.499319263, 9.4993382237)):
            Hole(F4_D / 2)

    # F5
    f5_edges = [f1_1.edges().sort_by_distance(p)[0] for p in [
        (-12.499319, -12.499338, 1.102371),
        (-12.499319, 12.499338, 1.102371),
        (12.499319, -12.499338, 1.102371),
        (12.499319, 12.499338, 1.102371),
    ]]
    fillet(f5_edges, radius=F5_R)

    # F6
    f6_edges = [f1_1.edges().sort_by_distance(p)[0] for p in [
        (-12.499319, 0, 2.204741),
        (-11.913533, 11.913552, 2.204741),
        (-11.913533, -11.913552, 2.204741),
        (0, 12.499338, 2.204741),
        (0, -12.499338, 2.204741),
        (11.913533, 11.913552, 2.204741),
        (11.913533, -11.913552, 2.204741),
        (12.499319, 0, 2.204741),
    ]]
    fillet(f6_edges, radius=F6_R)


solid = f1_1.part
